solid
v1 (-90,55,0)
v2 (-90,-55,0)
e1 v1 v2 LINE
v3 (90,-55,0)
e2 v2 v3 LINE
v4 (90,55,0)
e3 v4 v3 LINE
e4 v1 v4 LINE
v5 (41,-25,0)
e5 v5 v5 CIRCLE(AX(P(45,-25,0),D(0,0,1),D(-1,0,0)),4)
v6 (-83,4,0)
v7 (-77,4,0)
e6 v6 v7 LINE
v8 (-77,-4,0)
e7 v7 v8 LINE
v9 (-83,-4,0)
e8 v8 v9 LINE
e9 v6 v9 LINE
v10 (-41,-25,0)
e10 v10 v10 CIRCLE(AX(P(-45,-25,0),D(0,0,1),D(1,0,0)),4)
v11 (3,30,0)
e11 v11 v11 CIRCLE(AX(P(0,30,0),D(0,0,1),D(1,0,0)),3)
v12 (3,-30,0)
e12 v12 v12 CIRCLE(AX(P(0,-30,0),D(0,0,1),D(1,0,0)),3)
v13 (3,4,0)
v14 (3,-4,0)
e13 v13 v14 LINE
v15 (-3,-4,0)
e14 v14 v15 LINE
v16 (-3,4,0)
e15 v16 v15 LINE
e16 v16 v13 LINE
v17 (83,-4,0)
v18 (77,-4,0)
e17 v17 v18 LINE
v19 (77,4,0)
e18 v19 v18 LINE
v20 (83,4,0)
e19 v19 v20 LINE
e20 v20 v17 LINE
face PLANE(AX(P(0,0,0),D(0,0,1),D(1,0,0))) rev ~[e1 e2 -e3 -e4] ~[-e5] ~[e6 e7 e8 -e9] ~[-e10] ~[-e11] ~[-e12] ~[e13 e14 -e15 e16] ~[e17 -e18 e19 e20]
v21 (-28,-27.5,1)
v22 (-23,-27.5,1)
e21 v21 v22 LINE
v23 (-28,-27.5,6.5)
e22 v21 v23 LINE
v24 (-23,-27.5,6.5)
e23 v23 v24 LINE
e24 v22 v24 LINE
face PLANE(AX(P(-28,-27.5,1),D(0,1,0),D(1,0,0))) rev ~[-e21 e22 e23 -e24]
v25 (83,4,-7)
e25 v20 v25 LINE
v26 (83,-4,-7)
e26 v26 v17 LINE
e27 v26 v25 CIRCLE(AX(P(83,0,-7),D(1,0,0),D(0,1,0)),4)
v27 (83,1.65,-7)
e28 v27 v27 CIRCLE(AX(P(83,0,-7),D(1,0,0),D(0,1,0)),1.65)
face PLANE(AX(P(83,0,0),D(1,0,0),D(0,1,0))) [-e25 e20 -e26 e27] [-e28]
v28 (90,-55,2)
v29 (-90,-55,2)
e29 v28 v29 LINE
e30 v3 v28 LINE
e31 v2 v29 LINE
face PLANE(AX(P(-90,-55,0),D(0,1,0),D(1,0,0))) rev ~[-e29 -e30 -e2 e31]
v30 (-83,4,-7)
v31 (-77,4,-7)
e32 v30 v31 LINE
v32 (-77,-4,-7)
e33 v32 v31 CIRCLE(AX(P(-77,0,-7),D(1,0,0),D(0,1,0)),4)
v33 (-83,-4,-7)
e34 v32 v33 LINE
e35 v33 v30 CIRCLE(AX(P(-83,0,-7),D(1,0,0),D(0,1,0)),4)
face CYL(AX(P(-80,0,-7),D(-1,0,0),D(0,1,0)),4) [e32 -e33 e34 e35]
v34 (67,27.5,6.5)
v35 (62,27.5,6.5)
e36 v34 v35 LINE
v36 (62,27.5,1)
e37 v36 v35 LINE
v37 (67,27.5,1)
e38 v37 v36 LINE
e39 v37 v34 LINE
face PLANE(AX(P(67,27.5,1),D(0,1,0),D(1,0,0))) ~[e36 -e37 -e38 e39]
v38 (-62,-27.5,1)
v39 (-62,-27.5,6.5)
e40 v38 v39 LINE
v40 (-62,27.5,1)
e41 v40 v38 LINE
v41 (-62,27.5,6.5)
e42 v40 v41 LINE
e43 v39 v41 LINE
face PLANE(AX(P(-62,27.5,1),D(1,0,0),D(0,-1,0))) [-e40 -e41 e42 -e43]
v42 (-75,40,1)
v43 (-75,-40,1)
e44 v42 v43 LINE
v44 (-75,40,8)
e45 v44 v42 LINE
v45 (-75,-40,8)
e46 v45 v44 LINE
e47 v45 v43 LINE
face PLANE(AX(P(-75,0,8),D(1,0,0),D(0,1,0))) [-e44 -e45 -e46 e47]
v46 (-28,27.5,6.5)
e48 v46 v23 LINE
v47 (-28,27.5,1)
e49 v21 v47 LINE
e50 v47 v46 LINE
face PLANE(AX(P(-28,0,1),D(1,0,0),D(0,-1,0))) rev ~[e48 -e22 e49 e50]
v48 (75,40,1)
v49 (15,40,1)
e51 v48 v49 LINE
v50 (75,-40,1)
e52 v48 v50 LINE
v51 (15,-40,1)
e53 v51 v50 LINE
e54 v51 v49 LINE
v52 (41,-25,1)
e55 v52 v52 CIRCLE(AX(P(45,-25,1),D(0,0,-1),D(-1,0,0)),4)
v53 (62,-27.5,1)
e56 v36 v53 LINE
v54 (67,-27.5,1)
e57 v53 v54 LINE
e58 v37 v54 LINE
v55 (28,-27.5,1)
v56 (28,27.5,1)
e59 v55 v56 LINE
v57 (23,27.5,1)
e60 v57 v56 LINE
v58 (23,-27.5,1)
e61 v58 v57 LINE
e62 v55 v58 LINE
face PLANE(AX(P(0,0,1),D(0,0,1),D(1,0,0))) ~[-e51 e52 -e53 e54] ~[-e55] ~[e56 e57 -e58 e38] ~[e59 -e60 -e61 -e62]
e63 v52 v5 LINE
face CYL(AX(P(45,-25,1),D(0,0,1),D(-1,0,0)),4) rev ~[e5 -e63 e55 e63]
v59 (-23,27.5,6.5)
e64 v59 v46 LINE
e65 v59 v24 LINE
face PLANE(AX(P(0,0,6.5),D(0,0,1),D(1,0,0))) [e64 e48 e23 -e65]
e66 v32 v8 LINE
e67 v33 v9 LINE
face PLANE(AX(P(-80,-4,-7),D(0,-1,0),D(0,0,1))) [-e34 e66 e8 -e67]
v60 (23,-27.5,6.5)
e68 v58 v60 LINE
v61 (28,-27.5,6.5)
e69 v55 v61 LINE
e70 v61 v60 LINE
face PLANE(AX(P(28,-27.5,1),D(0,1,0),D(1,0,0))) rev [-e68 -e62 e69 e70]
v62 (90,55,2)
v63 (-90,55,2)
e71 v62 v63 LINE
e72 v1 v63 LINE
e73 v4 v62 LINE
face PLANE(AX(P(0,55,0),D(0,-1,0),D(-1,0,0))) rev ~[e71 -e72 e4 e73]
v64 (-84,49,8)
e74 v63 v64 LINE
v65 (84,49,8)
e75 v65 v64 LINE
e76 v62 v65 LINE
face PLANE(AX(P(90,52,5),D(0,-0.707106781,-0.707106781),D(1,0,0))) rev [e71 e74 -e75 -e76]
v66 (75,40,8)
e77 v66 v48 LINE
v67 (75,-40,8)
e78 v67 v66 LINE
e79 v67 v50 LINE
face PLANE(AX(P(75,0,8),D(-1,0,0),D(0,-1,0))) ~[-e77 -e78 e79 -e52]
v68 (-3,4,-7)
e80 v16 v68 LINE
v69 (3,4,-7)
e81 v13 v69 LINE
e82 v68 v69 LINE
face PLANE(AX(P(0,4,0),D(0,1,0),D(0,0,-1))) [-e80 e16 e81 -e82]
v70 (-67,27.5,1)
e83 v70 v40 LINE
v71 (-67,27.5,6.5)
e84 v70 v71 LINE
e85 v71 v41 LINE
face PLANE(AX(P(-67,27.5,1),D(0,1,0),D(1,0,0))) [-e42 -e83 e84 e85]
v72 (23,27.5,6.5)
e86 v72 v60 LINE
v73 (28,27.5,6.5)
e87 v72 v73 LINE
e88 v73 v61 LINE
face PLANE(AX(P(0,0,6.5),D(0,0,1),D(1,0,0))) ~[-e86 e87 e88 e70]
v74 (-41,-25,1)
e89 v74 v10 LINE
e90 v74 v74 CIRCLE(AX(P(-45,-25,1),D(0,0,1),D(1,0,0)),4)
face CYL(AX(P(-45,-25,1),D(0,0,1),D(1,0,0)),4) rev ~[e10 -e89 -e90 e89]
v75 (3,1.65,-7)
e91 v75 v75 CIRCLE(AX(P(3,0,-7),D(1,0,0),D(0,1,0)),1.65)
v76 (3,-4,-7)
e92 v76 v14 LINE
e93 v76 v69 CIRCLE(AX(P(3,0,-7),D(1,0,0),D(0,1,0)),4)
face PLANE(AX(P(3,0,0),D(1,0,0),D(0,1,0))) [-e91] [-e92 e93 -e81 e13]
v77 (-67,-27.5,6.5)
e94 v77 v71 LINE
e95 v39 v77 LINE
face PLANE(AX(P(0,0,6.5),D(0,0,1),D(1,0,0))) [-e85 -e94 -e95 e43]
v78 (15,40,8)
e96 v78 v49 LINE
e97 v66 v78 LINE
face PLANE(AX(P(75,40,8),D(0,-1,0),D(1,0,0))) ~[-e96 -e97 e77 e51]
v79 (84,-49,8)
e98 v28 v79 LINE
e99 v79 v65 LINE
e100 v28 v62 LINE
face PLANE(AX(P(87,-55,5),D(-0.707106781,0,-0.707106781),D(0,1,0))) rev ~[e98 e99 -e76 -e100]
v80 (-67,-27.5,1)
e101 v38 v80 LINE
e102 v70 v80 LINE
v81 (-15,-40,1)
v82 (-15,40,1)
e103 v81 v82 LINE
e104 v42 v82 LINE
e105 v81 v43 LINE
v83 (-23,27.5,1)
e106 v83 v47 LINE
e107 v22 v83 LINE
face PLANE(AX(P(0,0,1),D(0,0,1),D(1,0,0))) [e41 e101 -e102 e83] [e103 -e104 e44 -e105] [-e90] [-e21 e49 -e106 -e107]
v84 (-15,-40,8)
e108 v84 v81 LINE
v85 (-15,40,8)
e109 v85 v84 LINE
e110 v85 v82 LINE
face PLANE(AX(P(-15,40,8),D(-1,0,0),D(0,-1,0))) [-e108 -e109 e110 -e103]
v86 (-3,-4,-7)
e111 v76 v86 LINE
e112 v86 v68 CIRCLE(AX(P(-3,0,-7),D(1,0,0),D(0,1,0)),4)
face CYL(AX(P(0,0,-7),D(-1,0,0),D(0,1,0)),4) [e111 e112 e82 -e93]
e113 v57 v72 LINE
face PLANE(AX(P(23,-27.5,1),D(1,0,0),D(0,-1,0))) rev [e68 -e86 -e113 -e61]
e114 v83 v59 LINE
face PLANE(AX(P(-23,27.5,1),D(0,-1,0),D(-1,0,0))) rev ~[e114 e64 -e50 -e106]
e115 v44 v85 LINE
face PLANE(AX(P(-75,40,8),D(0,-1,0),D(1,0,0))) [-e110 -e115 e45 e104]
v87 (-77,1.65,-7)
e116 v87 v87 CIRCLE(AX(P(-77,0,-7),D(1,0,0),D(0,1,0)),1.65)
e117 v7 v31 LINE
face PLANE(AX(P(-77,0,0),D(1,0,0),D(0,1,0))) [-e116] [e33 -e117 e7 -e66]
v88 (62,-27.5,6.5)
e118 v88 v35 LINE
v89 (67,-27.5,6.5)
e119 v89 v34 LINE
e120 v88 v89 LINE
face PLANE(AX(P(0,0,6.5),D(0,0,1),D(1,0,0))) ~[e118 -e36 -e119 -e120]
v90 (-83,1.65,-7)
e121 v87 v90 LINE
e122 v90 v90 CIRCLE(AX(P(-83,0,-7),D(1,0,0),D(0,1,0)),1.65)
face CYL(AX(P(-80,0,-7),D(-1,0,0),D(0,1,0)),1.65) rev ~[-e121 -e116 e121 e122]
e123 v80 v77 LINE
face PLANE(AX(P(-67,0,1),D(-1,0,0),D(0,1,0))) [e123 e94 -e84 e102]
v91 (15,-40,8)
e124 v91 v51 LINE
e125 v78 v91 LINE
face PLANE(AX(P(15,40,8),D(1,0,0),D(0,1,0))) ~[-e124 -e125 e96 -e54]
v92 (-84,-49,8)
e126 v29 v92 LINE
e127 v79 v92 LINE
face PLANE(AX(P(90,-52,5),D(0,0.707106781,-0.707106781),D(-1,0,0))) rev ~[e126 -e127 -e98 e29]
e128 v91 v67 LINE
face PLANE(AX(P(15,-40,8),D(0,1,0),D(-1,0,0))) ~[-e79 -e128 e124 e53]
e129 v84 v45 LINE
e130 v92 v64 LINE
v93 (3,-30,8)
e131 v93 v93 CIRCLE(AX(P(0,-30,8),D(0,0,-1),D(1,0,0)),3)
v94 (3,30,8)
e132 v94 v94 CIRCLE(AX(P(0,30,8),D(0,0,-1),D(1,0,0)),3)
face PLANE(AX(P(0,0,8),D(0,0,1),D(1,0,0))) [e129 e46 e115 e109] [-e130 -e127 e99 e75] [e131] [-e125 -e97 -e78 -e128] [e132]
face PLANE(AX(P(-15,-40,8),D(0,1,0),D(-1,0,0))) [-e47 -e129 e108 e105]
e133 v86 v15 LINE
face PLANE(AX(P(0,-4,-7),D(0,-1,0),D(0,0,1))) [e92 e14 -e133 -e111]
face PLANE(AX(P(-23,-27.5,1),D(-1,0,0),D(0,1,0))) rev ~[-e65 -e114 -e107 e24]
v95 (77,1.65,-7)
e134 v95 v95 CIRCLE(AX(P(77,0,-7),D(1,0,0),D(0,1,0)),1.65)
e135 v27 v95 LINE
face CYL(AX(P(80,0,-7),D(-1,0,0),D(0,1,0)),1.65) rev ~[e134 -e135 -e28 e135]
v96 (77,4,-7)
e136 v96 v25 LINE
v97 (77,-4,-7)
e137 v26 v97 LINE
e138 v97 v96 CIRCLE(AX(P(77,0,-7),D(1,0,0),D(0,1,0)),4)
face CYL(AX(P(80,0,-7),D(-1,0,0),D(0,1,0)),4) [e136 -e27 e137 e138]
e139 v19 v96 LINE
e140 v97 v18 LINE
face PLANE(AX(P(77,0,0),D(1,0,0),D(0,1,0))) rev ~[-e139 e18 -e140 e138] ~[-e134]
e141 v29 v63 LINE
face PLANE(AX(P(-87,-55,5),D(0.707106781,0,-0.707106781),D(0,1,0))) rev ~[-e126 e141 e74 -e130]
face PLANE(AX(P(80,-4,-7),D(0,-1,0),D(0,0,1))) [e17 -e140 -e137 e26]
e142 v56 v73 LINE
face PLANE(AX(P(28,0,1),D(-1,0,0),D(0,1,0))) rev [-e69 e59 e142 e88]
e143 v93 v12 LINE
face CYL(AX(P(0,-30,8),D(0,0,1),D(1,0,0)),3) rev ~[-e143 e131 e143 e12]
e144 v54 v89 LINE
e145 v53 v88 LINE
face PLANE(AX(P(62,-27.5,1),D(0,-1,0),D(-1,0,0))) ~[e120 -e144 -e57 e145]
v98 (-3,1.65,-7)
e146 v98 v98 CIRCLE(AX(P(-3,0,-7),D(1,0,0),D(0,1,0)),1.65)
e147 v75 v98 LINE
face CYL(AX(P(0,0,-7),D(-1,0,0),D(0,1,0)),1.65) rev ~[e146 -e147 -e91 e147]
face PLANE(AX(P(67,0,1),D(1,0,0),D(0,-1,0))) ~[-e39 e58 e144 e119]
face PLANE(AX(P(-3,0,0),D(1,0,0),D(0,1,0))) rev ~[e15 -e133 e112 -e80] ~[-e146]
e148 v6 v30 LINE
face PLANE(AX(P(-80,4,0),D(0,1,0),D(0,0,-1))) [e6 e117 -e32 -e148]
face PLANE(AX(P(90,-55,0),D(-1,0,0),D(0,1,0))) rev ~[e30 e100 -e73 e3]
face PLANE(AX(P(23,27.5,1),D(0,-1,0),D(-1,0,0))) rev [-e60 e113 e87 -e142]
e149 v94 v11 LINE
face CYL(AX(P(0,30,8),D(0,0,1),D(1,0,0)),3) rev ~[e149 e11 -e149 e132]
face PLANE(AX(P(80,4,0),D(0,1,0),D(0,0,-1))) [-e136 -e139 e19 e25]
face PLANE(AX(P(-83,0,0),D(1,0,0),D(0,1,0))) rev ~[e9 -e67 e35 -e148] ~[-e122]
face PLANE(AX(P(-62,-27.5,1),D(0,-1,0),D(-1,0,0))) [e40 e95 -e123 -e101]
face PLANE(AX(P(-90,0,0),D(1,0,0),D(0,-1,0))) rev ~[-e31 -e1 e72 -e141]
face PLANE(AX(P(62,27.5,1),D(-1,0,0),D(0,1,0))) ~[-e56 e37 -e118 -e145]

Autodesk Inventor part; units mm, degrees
sketch "Skizze1" plane through (0, 0, 0) normal (0, 0, 1) x (1, 0, 0)
  line L0 (0, 40) -> (0, -37) construction
  line L1 (-52, 0) -> (54, 0) construction
  line L2 (-90, -55) -> (90, -55)
  line L3 (90, -55) -> (90, 55)
  line L4 (90, 55) -> (-90, 55)
  line L5 (-90, 55) -> (-90, -55)
  line L6 (0, -77) -> (0, 77) projected
  line L7 (-126, 0) -> (126, 0) projected
  point P0 (0, 0)
  dimension "d0" = 110
  dimension "d1" = 180
extrude "Extrusion1" add sketch "Skizze1" along normal blind 8
sketch "Skizze2" plane through (0, 0, 8) normal (0, 0, 1) x (1, 0, 0)
  line L0 (-75, 40) -> (-15, 40)
  line L1 (-15, 40) -> (-15, -40)
  line L2 (-15, -40) -> (-75, -40)
  line L3 (-75, -40) -> (-75, 40)
  line L4 (-126, 0) -> (126, 0) projected
  line L5 (0, 77) -> (0, -77) projected
  point P0 (0, 0)
  dimension "d4" = 60
  dimension "d5" = 80
  dimension "d6" = 15
extrude "Extrusion2" cut sketch "Skizze2" against normal blind 7
sketch "Skizze3" plane through (0, 0, 1) normal (0, 0, 1) x (1, 0, 0)
  line L0 (-15, 40) -> (-15, -40) projected
  line L1 (-15, -40) -> (-75, -40) projected
  line L2 (-75, -40) -> (-75, 40) projected
  line L3 (-15, -40) -> (-75, -40) projected
  line L4 (-15, 40) -> (-15, -40) projected
  line L5 (-75, 40) -> (-15, 40) projected
  line L6 (-126, 0) -> (126, 0) projected
  line L7 (0, 77) -> (0, -77) projected
  circle A0 centre (-45, -25) radius 4
  point P0 (0, 0)
  dimension "d9" = 8
  dimension "d10" = 30
  dimension "d11" = 15
extrude "Extrusion3" cut sketch "Skizze3" against normal blind 10 contours A0
sketch "Skizze4" plane through (0, 0, 1) normal (0, 0, 1) x (1, 0, 0)
  circle A0 centre (-45, -25) radius 4 projected
  line L0 (-75, -40) -> (-75, 40) projected
  line L1 (-15, -40) -> (-75, -40) projected
  line L2 (-15, 40) -> (-15, -40) projected
  line L3 (-75, 40) -> (-15, 40) projected
  line L4 (-126, 0) -> (126, 0) projected
  line L5 (-67, 27.5) -> (-62, 27.5)
  line L6 (-62, 27.5) -> (-62, -27.5)
  line L7 (-62, -27.5) -> (-67, -27.5)
  line L8 (-67, -27.5) -> (-67, 27.5)
  line L9 (-23, 27.5) -> (-28, 27.5)
  line L10 (-28, 27.5) -> (-28, -27.5)
  line L11 (-28, -27.5) -> (-23, -27.5)
  line L12 (-23, -27.5) -> (-23, 27.5)
  point P0 (0, 0)
  dimension "d14" = 5
  dimension "d15" = 55
  dimension "d16" = 8
  dimension "d17" = 55
  dimension "d18" = 5
  dimension "d19" = 8
extrude "Extrusion4" add sketch "Skizze4" along normal blind 5.5 contours L8 L5 L6 L4 | L4 L6 L7 L8 | L12 L11 L10 L4 | L4 L10 L9 L12
sketch "Skizze5" plane through (0, 0, 8) normal (0, 0, 1) x (1, 0, 0)
  line L0 (0, 77) -> (0, -77) projected
  line L1 (-126, 0) -> (126, 0) projected
  circle A0 centre (0, 30) radius 3
  circle A1 centre (0, -30) radius 3
  point P0 (0, 0)
  dimension "d22" = 6
  dimension "d23" = 6
  dimension "d24" = 30
  dimension "d25" = 30
extrude "Extrusion5" cut sketch "Skizze5" against normal blind 10
sketch "Skizze6" plane through (0, 0, 8) normal (0, 0, 1) x (1, 0, 0)
  line L0 (-75, 40) -> (-15, 40) projected
  line L1 (-75, -40) -> (-75, 40) projected
  line L2 (-67, 27.5) -> (-67, -27.5) projected
  line L3 (-62, -27.5) -> (-62, 27.5) projected
  line L4 (-62, 27.5) -> (-67, 27.5) projected
  line L5 (-67, -27.5) -> (-62, -27.5) projected
  line L6 (-15, -40) -> (-75, -40) projected
  circle A0 centre (-45, -25) radius 4 projected
  line L7 (-28, 27.5) -> (-28, -27.5) projected
  line L8 (-28, -27.5) -> (-23, -27.5) projected
  line L9 (-23, -27.5) -> (-23, 27.5) projected
  line L10 (-23, 27.5) -> (-28, 27.5) projected
  line L11 (-28, 27.5) -> (-28, -27.5) projected
  line L12 (-28, -27.5) -> (-23, -27.5) projected
  line L13 (-15, 40) -> (-15, -40) projected
  line L14 (0, 77) -> (0, -77) projected
  line L15 (-126, 0) -> (126, 0) projected
  point P0 (0, 0)
mirror "Spiegeln1" about plane through (0, 0, 0) normal (1, 0, 0) of "Extrusion4", "Extrusion2", "Extrusion3"
sketch "Skizze7" plane through (0, 0, 0) normal (0, 0, -1) x (-1, 0, 0)
  point P0 (0, 0)
sketch "Skizze8" plane through (0, 0, 0) normal (1, 0, 0) x (0, 1, 0)
  circle A0 centre (0, -7) radius 1.65
  circle A1 centre (0, -7) radius 4
  line L0 (55, 0) -> (-55, 0) projected
  line L1 (4, 0) -> (4, -7)
  line L2 (-4, -7) -> (-4, 0)
  point P0 (0, 0)
  dimension "d28" = 3.3
  dimension "d29" = 7
  dimension "d30" = 8
extrude "Extrusion6" add sketch "Skizze8" along normal mid plane 6
pattern_linear "Rechteckige Anordnung1" count 2 spacing 80 along (-1, 0, 0) of "Extrusion6"
pattern_linear "Rechteckige Anordnung2" count 2 spacing 80 along (1, 0, 0) of "Extrusion6"
chamfer "Fase1" distance 6 angle 45 4 edges at (0, 55, 8) (-90, 0, 8) (0, -55, 8) (90, 0, 8)
properties part number "PV-Halterung"
